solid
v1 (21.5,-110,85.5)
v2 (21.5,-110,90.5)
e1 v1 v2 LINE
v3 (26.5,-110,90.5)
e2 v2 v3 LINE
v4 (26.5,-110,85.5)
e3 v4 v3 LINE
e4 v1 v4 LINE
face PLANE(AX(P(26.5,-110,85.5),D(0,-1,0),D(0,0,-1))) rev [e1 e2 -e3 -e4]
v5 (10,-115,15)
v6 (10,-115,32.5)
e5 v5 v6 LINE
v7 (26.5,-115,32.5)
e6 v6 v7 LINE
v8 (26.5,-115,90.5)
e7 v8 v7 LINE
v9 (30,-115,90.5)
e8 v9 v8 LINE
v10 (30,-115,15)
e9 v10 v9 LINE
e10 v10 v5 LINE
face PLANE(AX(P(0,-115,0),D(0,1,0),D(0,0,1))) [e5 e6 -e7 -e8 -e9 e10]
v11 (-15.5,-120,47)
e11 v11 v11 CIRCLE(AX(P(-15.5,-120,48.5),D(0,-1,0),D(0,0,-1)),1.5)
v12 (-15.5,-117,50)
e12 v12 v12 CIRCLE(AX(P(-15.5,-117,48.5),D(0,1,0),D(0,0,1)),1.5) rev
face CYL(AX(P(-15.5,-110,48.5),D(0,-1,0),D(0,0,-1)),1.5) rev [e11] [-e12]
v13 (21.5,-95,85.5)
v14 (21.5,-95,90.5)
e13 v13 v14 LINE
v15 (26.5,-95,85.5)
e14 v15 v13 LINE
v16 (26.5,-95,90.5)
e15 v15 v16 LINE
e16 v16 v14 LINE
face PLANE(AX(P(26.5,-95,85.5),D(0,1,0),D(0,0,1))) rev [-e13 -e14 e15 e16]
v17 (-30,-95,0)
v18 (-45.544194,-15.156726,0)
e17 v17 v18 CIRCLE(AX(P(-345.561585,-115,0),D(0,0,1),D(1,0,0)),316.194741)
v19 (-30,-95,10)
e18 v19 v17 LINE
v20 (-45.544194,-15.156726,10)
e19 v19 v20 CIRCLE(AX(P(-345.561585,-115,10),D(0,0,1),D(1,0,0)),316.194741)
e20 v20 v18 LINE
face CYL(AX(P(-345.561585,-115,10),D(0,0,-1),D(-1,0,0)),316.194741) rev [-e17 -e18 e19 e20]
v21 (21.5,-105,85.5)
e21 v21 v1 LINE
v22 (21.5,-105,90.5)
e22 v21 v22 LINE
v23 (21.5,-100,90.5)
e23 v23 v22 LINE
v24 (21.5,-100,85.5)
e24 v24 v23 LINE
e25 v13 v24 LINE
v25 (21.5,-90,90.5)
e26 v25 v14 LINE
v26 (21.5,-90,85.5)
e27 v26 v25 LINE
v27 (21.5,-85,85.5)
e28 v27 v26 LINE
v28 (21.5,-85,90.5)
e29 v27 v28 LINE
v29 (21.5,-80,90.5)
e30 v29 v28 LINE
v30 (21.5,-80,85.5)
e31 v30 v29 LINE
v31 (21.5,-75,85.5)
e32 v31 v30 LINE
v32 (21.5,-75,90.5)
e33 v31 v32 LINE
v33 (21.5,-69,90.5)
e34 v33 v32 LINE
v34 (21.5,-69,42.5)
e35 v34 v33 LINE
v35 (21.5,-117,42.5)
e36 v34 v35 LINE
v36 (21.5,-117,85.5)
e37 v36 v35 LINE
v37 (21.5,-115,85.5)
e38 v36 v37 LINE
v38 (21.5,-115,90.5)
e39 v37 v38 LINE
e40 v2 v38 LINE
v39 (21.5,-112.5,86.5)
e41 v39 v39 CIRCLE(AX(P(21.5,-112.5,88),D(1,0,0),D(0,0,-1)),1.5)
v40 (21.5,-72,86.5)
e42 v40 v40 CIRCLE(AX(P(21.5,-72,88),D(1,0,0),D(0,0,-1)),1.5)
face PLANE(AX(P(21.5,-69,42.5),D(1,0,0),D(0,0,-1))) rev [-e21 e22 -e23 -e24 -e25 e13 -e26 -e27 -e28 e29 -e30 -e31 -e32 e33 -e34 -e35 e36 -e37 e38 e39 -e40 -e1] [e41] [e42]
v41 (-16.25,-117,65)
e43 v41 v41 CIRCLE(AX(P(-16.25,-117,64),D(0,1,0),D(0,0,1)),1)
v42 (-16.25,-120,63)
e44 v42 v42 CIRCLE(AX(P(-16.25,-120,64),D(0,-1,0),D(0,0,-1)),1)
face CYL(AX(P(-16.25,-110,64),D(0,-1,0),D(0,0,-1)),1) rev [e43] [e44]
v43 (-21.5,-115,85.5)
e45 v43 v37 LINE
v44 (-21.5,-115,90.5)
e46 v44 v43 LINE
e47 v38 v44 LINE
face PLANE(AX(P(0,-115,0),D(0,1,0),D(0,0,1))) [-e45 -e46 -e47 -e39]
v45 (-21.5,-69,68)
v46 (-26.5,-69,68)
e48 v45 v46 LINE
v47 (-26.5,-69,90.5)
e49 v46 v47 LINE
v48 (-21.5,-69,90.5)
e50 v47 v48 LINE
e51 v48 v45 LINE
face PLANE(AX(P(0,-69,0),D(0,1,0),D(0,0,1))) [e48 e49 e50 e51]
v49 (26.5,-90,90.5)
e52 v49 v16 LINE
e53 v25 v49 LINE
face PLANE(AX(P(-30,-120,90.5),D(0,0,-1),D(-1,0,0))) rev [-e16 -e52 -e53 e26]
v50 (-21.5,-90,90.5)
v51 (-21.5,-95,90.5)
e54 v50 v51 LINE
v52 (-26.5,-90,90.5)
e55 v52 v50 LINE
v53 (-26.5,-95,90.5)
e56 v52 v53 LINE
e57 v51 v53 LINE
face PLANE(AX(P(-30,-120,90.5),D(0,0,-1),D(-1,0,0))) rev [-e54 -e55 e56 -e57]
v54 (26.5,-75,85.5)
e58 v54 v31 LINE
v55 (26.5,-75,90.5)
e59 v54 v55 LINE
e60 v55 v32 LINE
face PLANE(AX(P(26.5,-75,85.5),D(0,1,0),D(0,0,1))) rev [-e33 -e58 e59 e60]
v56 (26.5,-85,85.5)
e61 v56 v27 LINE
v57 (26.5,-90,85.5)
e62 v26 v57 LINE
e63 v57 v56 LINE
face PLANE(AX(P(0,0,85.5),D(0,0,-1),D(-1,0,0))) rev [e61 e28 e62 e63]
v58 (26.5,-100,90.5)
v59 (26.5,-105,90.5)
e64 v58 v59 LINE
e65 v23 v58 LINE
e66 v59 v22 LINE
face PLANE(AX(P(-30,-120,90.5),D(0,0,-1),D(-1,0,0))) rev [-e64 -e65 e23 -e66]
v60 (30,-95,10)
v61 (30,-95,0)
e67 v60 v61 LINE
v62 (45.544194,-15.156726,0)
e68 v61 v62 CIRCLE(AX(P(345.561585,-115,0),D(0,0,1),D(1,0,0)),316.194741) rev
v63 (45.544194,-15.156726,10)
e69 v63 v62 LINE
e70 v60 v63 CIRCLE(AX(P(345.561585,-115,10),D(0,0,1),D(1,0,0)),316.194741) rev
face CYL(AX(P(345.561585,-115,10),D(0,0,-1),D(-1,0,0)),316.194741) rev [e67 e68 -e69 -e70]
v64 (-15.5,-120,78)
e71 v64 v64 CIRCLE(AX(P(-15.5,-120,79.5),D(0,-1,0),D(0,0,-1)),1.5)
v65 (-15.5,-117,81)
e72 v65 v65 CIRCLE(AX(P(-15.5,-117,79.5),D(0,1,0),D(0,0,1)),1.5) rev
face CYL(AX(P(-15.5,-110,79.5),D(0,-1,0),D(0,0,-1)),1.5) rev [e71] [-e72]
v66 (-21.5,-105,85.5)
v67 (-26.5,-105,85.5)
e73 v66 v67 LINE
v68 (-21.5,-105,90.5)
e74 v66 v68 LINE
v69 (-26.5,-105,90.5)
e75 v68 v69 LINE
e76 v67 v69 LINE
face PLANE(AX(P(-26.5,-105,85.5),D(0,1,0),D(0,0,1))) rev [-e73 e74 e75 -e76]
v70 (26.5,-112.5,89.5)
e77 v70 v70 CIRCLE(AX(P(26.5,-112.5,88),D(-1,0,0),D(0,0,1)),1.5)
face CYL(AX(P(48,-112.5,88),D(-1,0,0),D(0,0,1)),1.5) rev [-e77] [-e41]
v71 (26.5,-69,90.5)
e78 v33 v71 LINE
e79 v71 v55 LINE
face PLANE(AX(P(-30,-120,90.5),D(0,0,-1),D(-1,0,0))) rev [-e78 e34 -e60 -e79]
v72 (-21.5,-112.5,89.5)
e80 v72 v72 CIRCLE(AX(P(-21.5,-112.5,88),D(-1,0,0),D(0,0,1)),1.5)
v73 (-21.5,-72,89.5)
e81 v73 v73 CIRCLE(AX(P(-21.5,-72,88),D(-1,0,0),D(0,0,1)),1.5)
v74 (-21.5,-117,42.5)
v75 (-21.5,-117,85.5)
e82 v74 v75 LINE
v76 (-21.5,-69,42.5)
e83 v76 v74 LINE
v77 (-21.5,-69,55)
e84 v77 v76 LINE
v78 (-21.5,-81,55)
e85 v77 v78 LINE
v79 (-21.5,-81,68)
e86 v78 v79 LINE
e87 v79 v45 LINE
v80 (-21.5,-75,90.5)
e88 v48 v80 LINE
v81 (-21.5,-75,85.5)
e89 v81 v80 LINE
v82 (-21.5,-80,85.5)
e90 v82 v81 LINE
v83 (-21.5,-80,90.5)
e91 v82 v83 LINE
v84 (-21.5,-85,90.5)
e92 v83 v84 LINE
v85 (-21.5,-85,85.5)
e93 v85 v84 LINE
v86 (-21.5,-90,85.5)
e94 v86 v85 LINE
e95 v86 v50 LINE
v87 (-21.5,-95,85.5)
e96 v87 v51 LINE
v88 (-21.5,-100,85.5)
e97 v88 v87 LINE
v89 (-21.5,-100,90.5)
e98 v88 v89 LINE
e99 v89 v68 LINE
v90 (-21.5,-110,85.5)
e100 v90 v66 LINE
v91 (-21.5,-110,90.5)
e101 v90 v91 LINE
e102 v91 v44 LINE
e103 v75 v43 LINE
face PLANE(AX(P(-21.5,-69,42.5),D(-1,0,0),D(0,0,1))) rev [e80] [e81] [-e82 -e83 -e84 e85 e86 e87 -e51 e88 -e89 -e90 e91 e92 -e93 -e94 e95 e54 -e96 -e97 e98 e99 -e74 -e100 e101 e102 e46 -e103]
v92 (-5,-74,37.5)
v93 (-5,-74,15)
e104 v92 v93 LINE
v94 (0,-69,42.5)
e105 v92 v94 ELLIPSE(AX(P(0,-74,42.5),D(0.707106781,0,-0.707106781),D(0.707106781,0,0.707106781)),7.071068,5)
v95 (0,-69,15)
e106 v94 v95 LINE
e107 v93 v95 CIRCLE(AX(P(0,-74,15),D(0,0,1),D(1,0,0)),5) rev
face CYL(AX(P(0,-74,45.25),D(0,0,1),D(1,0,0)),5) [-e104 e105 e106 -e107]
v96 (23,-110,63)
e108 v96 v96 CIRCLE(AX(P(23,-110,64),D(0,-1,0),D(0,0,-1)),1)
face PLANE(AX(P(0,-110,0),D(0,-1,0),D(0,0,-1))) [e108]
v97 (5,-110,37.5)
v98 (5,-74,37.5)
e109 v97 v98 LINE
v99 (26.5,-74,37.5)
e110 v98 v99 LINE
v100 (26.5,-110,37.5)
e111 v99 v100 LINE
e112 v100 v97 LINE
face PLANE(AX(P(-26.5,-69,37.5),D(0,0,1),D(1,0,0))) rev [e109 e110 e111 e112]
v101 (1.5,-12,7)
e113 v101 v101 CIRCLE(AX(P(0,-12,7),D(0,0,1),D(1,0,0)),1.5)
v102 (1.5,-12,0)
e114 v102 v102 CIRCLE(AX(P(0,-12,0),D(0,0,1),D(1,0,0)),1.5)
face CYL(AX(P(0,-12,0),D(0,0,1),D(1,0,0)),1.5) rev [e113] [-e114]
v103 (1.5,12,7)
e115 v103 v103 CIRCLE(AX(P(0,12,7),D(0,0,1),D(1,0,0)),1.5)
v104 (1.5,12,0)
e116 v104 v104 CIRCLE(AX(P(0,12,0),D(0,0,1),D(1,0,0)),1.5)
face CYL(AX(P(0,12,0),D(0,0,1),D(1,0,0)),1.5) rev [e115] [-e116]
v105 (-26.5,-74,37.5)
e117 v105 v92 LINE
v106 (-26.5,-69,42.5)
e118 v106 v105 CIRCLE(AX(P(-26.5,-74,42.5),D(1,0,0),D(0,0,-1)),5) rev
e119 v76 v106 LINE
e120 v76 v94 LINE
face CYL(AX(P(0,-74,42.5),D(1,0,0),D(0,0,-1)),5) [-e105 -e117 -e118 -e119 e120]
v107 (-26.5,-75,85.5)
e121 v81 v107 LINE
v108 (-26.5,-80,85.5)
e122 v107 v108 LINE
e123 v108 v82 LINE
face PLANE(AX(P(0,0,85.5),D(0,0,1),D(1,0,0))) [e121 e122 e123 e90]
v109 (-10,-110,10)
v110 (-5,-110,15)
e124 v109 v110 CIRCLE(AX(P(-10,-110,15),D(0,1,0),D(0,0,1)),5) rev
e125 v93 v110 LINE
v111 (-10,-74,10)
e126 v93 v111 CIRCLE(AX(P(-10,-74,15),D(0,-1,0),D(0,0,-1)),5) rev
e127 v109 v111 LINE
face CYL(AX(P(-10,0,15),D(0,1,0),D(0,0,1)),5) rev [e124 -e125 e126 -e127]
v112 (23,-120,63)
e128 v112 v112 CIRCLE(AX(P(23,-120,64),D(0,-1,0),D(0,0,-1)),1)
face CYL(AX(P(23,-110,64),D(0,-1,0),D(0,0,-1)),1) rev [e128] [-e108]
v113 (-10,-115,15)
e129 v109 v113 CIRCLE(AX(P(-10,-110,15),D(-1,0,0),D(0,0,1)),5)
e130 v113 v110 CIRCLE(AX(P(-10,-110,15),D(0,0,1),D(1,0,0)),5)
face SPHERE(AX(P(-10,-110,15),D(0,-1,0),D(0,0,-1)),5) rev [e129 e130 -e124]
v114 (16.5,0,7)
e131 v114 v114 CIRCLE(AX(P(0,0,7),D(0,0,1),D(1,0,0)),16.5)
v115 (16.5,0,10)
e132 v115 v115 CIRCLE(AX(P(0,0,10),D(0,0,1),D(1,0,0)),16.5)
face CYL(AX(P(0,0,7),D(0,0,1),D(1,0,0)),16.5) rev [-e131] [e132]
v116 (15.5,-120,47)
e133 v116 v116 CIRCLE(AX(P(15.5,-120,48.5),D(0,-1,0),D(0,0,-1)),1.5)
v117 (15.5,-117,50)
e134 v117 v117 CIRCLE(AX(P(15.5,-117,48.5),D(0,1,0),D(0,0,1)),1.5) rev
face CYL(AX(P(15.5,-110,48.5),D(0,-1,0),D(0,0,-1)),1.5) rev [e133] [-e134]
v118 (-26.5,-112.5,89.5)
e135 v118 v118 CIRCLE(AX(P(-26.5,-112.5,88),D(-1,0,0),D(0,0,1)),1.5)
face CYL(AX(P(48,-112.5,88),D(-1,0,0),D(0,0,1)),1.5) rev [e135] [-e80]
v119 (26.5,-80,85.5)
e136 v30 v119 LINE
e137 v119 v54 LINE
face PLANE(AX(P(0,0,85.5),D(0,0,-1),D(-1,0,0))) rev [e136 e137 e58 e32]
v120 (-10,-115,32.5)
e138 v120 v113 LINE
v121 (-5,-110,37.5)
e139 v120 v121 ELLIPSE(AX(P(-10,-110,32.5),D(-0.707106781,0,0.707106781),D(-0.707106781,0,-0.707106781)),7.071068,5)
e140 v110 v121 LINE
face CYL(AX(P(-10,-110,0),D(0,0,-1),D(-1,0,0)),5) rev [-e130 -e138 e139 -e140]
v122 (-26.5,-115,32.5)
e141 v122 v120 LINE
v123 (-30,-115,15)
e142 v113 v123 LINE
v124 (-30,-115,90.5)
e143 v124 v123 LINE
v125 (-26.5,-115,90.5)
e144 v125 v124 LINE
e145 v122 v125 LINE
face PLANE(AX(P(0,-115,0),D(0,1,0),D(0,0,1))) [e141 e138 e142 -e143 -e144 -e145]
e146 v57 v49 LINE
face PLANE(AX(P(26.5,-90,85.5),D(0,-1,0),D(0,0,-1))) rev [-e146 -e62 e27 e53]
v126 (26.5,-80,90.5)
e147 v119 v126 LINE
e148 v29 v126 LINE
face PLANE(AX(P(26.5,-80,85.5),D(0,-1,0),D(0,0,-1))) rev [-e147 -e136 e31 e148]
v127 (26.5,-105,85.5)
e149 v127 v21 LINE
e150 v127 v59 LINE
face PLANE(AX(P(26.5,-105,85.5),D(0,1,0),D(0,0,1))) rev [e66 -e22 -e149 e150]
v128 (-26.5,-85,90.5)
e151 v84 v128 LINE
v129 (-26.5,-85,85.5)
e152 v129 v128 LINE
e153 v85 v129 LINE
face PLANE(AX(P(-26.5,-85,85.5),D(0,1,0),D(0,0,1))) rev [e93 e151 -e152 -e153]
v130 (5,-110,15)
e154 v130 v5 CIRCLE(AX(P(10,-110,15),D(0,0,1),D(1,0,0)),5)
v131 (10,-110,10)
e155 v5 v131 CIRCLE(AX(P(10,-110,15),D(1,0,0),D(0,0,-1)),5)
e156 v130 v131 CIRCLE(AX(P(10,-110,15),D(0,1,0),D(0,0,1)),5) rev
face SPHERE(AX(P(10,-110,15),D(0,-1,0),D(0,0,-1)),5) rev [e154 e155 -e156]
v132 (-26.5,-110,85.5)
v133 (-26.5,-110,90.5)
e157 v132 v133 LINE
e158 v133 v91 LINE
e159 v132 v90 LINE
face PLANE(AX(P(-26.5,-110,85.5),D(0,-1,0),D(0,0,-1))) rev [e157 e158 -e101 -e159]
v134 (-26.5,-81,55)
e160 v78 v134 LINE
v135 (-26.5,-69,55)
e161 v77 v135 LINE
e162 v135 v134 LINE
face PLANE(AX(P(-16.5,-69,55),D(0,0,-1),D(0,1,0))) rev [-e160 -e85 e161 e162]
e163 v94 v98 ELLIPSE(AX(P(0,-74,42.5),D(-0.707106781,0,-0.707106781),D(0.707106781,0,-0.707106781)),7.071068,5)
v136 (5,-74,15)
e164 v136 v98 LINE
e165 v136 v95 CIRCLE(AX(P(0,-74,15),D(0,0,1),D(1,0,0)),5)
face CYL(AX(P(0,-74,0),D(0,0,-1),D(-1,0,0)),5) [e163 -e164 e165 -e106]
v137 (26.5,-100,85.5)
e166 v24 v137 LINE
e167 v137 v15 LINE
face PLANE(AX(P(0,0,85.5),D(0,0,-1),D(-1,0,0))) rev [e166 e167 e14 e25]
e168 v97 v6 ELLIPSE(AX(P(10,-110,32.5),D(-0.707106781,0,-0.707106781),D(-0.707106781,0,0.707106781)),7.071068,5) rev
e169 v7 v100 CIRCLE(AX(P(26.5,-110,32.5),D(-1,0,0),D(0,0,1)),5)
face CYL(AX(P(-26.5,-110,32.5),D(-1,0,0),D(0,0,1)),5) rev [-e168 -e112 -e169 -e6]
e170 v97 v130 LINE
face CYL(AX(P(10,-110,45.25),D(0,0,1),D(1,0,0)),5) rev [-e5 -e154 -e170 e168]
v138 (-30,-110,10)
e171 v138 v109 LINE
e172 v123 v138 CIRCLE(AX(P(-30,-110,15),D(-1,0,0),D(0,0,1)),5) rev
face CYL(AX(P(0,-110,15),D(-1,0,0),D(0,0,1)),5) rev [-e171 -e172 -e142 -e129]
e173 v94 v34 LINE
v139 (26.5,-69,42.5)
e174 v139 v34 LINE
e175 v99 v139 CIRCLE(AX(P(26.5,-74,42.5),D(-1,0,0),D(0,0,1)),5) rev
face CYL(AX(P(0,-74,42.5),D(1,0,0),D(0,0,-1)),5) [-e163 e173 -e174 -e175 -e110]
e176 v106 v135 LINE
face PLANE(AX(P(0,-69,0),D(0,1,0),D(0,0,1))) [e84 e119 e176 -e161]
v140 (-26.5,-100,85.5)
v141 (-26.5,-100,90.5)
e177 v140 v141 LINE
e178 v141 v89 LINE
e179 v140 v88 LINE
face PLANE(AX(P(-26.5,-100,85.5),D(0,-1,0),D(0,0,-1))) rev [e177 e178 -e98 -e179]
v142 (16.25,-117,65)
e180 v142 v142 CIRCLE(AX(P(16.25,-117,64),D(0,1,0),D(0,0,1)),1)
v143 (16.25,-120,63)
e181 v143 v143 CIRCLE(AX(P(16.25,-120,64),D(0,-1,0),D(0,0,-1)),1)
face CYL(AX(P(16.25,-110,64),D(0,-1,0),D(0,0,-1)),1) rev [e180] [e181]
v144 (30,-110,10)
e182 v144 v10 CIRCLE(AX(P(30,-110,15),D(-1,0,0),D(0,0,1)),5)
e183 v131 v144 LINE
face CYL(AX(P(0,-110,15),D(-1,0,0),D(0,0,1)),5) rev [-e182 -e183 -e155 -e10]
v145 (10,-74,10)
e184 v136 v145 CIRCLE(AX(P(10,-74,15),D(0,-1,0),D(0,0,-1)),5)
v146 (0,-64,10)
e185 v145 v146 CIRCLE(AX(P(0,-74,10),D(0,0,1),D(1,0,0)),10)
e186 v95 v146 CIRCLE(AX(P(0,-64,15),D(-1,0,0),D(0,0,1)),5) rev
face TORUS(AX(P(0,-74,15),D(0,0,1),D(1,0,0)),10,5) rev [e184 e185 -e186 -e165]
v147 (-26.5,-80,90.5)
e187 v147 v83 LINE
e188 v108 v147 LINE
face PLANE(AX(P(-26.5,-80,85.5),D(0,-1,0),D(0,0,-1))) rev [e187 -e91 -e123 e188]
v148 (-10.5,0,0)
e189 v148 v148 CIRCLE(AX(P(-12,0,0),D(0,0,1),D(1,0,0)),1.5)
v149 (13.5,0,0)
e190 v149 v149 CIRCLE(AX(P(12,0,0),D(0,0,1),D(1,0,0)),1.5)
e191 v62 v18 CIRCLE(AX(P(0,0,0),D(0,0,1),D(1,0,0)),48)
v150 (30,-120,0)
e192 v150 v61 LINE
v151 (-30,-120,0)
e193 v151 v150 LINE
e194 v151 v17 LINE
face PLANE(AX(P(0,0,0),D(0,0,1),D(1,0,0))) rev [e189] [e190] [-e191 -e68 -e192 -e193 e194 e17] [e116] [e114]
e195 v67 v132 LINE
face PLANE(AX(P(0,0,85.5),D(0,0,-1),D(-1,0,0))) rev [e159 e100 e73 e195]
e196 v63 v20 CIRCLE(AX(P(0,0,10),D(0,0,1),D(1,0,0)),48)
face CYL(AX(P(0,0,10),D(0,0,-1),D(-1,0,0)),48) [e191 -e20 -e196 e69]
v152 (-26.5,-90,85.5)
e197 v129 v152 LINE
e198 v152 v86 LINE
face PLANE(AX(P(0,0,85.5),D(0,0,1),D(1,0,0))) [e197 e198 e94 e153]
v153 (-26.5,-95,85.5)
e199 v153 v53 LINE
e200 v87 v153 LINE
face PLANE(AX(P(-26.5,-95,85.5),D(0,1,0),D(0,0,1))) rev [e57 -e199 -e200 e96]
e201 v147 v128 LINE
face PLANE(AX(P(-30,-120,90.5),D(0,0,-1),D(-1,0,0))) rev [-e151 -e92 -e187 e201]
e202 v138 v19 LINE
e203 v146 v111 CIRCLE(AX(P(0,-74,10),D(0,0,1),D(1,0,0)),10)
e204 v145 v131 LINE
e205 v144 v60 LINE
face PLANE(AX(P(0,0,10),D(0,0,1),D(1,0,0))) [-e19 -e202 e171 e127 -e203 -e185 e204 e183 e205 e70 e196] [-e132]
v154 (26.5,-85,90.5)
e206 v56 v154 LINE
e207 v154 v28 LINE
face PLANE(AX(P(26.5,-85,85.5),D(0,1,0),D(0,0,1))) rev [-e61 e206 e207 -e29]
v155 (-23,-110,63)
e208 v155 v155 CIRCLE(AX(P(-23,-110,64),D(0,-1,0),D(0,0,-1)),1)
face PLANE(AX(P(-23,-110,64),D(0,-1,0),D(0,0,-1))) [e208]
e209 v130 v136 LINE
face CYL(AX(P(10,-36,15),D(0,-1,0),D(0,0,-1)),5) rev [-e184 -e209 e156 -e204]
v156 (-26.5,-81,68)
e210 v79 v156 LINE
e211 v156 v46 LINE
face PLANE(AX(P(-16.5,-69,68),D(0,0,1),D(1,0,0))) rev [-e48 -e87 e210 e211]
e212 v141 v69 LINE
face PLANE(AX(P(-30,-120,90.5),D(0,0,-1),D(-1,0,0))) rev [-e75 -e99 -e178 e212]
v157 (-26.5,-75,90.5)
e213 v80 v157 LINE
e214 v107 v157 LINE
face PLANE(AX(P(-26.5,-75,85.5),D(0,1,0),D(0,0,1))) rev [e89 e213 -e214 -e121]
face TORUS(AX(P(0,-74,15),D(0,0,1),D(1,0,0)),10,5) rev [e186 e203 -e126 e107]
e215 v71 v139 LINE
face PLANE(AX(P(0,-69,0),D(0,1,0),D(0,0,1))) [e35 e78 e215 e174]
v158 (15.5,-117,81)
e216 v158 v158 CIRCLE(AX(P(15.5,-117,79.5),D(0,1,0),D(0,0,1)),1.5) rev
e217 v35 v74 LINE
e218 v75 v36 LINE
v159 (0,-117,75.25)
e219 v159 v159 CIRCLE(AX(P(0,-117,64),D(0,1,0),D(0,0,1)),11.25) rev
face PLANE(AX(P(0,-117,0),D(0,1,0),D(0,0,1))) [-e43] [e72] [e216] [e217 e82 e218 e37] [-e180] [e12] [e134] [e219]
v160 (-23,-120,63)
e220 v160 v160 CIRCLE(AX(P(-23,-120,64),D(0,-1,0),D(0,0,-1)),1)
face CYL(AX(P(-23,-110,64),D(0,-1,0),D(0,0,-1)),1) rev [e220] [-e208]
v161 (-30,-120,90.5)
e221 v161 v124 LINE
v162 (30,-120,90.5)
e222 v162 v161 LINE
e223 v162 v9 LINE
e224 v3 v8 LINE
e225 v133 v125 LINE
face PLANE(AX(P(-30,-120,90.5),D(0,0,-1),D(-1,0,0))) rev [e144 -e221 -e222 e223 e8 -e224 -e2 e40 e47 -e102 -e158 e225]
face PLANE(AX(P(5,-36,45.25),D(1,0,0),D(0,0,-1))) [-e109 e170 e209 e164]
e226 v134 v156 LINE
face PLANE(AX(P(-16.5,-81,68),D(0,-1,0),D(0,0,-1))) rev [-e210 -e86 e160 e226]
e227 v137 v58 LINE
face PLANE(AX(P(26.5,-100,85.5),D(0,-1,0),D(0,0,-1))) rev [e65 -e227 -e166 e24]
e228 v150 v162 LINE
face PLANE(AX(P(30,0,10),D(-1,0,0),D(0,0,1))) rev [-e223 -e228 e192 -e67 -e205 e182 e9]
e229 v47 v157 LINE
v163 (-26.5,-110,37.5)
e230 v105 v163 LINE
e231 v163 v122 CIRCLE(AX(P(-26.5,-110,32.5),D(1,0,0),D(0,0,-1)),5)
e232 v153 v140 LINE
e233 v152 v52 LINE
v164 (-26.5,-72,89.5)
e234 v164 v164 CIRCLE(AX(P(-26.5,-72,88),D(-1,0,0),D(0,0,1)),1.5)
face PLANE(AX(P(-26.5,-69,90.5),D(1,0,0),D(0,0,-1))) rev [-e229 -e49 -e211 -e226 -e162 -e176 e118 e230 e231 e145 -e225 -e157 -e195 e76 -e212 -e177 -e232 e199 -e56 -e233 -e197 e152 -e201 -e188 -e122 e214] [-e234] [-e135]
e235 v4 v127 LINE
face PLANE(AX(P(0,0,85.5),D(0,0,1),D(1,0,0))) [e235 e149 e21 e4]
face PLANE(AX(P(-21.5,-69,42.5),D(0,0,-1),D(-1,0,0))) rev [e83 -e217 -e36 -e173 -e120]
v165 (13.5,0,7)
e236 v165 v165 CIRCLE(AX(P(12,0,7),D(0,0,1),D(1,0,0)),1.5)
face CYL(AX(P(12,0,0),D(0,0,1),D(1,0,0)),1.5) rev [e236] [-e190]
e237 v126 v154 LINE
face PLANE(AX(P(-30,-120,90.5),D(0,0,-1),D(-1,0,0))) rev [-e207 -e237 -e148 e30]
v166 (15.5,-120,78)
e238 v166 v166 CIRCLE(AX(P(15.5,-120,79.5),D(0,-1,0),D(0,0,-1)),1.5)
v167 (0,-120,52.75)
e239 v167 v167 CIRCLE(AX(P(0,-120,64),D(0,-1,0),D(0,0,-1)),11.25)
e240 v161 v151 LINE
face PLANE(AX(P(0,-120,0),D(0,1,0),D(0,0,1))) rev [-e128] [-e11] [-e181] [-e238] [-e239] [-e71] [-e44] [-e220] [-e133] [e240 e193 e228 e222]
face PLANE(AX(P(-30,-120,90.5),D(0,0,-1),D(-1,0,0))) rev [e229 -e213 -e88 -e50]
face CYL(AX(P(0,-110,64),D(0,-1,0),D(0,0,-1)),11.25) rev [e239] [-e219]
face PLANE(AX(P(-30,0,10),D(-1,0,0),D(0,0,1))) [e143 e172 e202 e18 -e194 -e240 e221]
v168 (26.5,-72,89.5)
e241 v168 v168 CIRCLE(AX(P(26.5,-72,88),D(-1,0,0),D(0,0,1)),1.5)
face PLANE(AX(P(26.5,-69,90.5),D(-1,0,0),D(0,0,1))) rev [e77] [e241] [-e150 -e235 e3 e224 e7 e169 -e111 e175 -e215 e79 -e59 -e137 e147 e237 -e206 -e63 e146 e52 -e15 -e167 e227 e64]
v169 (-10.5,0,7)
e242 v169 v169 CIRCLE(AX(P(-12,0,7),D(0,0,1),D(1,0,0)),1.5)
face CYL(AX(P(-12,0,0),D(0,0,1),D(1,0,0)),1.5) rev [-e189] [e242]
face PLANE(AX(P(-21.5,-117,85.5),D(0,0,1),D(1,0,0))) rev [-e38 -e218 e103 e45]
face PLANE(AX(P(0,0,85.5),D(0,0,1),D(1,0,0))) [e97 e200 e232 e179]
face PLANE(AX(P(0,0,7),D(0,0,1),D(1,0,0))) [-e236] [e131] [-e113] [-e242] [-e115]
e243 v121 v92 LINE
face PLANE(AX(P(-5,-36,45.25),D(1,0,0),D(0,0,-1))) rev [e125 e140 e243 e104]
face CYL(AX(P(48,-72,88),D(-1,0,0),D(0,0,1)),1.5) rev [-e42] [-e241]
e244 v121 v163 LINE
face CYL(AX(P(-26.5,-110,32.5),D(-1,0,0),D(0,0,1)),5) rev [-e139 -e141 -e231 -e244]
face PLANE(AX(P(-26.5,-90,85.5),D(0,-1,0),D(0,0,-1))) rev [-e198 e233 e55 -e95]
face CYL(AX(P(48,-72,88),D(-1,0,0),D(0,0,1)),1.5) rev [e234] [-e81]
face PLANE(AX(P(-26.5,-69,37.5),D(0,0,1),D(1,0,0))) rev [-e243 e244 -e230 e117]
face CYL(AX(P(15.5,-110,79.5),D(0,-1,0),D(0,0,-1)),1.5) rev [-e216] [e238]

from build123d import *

# Parameters (mm, degrees)
SALIENTE_EXTRUIR1_DEPTH = 10
CROQUIS5_R              = 16.5
CORTAR_EXTRUIR4_DEPTH   = 3
CROQUIS4_R              = 1.5
CORTAR_EXTRUIR8_DEPTH   = 126.015998976
CROQUIS6_W              = 60
CROQUIS6_H              = 90.5
SALIENTE_EXTRUIR2_DEPTH = 5
CROQUIS7_R              = 11.25
CROQUIS7_R_2            = 1.5
CORTAR_EXTRUIR9_DEPTH   = 10
SALIENTE_EXTRUIR3_DEPTH = 46
CROQUIS10_W             = 5
CROQUIS10_H             = 5
CORTAR_EXTRUIR11_DEPTH  = 5
CROQUIS11_R             = 1.5
CORTAR_EXTRUIR12_DEPTH  = 168.751304019
CROQUIS13_W             = 43
CROQUIS13_H             = 43
CORTAR_EXTRUIR13_DEPTH  = 2
CROQUIS16_R             = 1
CORTAR_EXTRUIR14_DEPTH  = 10
NERVIO1_REACH           = 159.779
CROQUIS17_WALL_W        = 345.058235512
CROQUIS17_WALL_H        = 10
REDONDEO2_R             = 5
CROQUIS18_W             = 13
CROQUIS18_H             = 12
CORTAR_EXTRUIR15_DEPTH  = 10


with BuildPart() as part:
    # Croquis1 → Saliente-Extruir1 (new body)
    with BuildSketch(Plane.XY):
        with BuildLine():
            Line((-30, -95), (-30, -115))
            Line((-30, -115), (30, -115))
            Line((30, -115), (30, -95))
            ThreePointArc((30, -95), (35.193890367, -54.576427951), (45.544194453, -15.156726282))
            ThreePointArc((45.544194453, -15.156726282), (0, 48), (-45.544194453, -15.156726282))
            ThreePointArc((-45.544194453, -15.156726282), (-35.193890367, -54.576427951), (-30, -95))
        make_face()
    extrude(amount=SALIENTE_EXTRUIR1_DEPTH)

    # Croquis5 → Cortar-Extruir4 (cut)
    with BuildSketch(Plane.XY.offset(10)):
        Circle(CROQUIS5_R)
    extrude(amount=-CORTAR_EXTRUIR4_DEPTH, mode=Mode.SUBTRACT)

    # Croquis4 → Cortar-Extruir8 (cut, through all)
    with BuildSketch(Plane(origin=(0, 0, 10), x_dir=(-1, 0, 0), z_dir=(0, 0, 1))):
        with Locations(Location((0, 12, 0), (0, 0, 180))):
            Circle(CROQUIS4_R)
        with Locations(Location((12, 0, 0), (0, 0, 180))):
            Circle(CROQUIS4_R)
        with Locations(Location((0, -12, 0), (0, 0, 180))):
            Circle(CROQUIS4_R)
        with Locations(Location((-12, 0, 0), (0, 0, 180))):
            Circle(CROQUIS4_R)
    extrude(amount=-CORTAR_EXTRUIR8_DEPTH, mode=Mode.SUBTRACT)

    # Croquis6 → Saliente-Extruir2 (add)
    with BuildSketch(Plane.XZ.offset(115)):
        with Locations((0, 45.25)):
            Rectangle(CROQUIS6_W, CROQUIS6_H)
    extrude(amount=SALIENTE_EXTRUIR2_DEPTH)

    # Croquis7 → Cortar-Extruir9 (cut)
    with BuildSketch(Plane.XZ.offset(120)):
        with Locations(Location((0, 64, 0), (0, 0, 270))):
            Circle(CROQUIS7_R)
        with Locations(Location((-15.5, 79.5, 0), (0, 0, 270))):
            Circle(CROQUIS7_R_2)
        with Locations(Location((15.5, 79.5, 0), (0, 0, 270))):
            Circle(CROQUIS7_R_2)
        with Locations(Location((15.5, 48.5, 0), (0, 0, 270))):
            Circle(CROQUIS7_R_2)
        with Locations(Location((-15.5, 48.5, 0), (0, 0, 270))):
            Circle(CROQUIS7_R_2)
    extrude(amount=-CORTAR_EXTRUIR9_DEPTH, mode=Mode.SUBTRACT)

    # Croquis8 → Saliente-Extruir3 (add)
    with BuildSketch(Plane(origin=(0, -115, 0), x_dir=(1, 0, 0), z_dir=(0, 1, 0))):
        Polygon((-21.5, -42.5), (21.5, -42.5), (21.5, -90.5), (26.5, -90.5), (26.5, -37.5), (-26.5, -37.5), (-26.5, -90.5), (-21.5, -90.5), align=None)
    extrude(amount=SALIENTE_EXTRUIR3_DEPTH)

    # Croquis10 → Cortar-Extruir11 (cut)
    with BuildSketch(Plane.XY.offset(90.5)):
        with Locations((24, -107.5)):
            Rectangle(CROQUIS10_W, CROQUIS10_H)
        with Locations((-24, -107.5)):
            Rectangle(CROQUIS10_W, CROQUIS10_H)
        with Locations((-24, -97.5)):
            Rectangle(CROQUIS10_W, CROQUIS10_H)
        with Locations((24, -97.5)):
            Rectangle(CROQUIS10_W, CROQUIS10_H)
        with Locations((-24, -87.5)):
            Rectangle(CROQUIS10_W, CROQUIS10_H)
        with Locations((24, -87.5)):
            Rectangle(CROQUIS10_W, CROQUIS10_H)
        with Locations((-24, -77.5)):
            Rectangle(CROQUIS10_W, CROQUIS10_H)
        with Locations((24, -77.5)):
            Rectangle(CROQUIS10_W, CROQUIS10_H)
    extrude(amount=-CORTAR_EXTRUIR11_DEPTH, mode=Mode.SUBTRACT)

    # Croquis11 → Cortar-Extruir12 (cut, through all)
    with BuildSketch(Plane.ZY.offset(26.5)):
        with Locations((88, -112.5)):
            Circle(CROQUIS11_R)
        with Locations((88, -72)):
            Circle(CROQUIS11_R)
    extrude(amount=-CORTAR_EXTRUIR12_DEPTH, mode=Mode.SUBTRACT)

    # Croquis13 → Cortar-Extruir13 (cut)
    with BuildSketch(Plane(origin=(0, -115, 0), x_dir=(1, 0, 0), z_dir=(0, 1, 0))):
        with Locations((0, -64)):
            Rectangle(CROQUIS13_W, CROQUIS13_H)
    extrude(amount=-CORTAR_EXTRUIR13_DEPTH, mode=Mode.SUBTRACT)

    # Croquis16 → Cortar-Extruir14 (cut)
    with BuildSketch(Plane.XZ.offset(120)):
        with Locations(Location((-16.25, 64, 0), (0, 0, 270))):
            Circle(CROQUIS16_R)
        with Locations(Location((16.25, 64, 0), (0, 0, 270))):
            Circle(CROQUIS16_R)
        with Locations(Location((-23, 64, 0), (0, 0, 270))):
            Circle(CROQUIS16_R)
        with Locations(Location((23, 64, 0), (0, 0, 270))):
            Circle(CROQUIS16_R)
    extrude(amount=-CORTAR_EXTRUIR14_DEPTH, mode=Mode.SUBTRACT)

    # Croquis17 wall → Nervio1 (add, up to next)
    with BuildSketch(Plane(origin=(0, -69, 23.75), x_dir=(0, 0, -1), z_dir=(0, 1, 0)), mode=Mode.PRIVATE) as nervio1_sk1:
        Rectangle(CROQUIS17_WALL_W, CROQUIS17_WALL_H)
    nervio1_tool1 = extrude(nervio1_sk1.sketch, amount=-NERVIO1_REACH, mode=Mode.PRIVATE) - part.part
    add(nervio1_tool1.solids().sort_by_distance((0, -69, 23.75))[0])

    # Redondeo2
    redondeo2_edges = [part.edges().sort_by_distance(p)[0] for p in [
        (15.75, -115, 37.5),
        (15.75, -69, 37.5),
        (-17.5, -115, 10),
        (-15.75, -69, 37.5),
        (-15.75, -115, 37.5),
        (17.5, -115, 10),
        (5, -69, 23.75),
        (0, -69, 10),
        (5, -115, 23.75),
        (5, -92, 10),
        (-5, -115, 23.75),
        (-5, -92, 10),
        (-5, -69, 23.75),
    ]]
    fillet(redondeo2_edges, radius=REDONDEO2_R - 0.0001)  # a hair under: the kernel refuses the full size

    # Croquis18 → Cortar-Extruir15 (cut)
    with BuildSketch(Plane.ZY.offset(26.5)):
        with Locations((61.5, -75)):
            Rectangle(CROQUIS18_W, CROQUIS18_H)
    extrude(amount=-CORTAR_EXTRUIR15_DEPTH, mode=Mode.SUBTRACT)


solid = part.part
